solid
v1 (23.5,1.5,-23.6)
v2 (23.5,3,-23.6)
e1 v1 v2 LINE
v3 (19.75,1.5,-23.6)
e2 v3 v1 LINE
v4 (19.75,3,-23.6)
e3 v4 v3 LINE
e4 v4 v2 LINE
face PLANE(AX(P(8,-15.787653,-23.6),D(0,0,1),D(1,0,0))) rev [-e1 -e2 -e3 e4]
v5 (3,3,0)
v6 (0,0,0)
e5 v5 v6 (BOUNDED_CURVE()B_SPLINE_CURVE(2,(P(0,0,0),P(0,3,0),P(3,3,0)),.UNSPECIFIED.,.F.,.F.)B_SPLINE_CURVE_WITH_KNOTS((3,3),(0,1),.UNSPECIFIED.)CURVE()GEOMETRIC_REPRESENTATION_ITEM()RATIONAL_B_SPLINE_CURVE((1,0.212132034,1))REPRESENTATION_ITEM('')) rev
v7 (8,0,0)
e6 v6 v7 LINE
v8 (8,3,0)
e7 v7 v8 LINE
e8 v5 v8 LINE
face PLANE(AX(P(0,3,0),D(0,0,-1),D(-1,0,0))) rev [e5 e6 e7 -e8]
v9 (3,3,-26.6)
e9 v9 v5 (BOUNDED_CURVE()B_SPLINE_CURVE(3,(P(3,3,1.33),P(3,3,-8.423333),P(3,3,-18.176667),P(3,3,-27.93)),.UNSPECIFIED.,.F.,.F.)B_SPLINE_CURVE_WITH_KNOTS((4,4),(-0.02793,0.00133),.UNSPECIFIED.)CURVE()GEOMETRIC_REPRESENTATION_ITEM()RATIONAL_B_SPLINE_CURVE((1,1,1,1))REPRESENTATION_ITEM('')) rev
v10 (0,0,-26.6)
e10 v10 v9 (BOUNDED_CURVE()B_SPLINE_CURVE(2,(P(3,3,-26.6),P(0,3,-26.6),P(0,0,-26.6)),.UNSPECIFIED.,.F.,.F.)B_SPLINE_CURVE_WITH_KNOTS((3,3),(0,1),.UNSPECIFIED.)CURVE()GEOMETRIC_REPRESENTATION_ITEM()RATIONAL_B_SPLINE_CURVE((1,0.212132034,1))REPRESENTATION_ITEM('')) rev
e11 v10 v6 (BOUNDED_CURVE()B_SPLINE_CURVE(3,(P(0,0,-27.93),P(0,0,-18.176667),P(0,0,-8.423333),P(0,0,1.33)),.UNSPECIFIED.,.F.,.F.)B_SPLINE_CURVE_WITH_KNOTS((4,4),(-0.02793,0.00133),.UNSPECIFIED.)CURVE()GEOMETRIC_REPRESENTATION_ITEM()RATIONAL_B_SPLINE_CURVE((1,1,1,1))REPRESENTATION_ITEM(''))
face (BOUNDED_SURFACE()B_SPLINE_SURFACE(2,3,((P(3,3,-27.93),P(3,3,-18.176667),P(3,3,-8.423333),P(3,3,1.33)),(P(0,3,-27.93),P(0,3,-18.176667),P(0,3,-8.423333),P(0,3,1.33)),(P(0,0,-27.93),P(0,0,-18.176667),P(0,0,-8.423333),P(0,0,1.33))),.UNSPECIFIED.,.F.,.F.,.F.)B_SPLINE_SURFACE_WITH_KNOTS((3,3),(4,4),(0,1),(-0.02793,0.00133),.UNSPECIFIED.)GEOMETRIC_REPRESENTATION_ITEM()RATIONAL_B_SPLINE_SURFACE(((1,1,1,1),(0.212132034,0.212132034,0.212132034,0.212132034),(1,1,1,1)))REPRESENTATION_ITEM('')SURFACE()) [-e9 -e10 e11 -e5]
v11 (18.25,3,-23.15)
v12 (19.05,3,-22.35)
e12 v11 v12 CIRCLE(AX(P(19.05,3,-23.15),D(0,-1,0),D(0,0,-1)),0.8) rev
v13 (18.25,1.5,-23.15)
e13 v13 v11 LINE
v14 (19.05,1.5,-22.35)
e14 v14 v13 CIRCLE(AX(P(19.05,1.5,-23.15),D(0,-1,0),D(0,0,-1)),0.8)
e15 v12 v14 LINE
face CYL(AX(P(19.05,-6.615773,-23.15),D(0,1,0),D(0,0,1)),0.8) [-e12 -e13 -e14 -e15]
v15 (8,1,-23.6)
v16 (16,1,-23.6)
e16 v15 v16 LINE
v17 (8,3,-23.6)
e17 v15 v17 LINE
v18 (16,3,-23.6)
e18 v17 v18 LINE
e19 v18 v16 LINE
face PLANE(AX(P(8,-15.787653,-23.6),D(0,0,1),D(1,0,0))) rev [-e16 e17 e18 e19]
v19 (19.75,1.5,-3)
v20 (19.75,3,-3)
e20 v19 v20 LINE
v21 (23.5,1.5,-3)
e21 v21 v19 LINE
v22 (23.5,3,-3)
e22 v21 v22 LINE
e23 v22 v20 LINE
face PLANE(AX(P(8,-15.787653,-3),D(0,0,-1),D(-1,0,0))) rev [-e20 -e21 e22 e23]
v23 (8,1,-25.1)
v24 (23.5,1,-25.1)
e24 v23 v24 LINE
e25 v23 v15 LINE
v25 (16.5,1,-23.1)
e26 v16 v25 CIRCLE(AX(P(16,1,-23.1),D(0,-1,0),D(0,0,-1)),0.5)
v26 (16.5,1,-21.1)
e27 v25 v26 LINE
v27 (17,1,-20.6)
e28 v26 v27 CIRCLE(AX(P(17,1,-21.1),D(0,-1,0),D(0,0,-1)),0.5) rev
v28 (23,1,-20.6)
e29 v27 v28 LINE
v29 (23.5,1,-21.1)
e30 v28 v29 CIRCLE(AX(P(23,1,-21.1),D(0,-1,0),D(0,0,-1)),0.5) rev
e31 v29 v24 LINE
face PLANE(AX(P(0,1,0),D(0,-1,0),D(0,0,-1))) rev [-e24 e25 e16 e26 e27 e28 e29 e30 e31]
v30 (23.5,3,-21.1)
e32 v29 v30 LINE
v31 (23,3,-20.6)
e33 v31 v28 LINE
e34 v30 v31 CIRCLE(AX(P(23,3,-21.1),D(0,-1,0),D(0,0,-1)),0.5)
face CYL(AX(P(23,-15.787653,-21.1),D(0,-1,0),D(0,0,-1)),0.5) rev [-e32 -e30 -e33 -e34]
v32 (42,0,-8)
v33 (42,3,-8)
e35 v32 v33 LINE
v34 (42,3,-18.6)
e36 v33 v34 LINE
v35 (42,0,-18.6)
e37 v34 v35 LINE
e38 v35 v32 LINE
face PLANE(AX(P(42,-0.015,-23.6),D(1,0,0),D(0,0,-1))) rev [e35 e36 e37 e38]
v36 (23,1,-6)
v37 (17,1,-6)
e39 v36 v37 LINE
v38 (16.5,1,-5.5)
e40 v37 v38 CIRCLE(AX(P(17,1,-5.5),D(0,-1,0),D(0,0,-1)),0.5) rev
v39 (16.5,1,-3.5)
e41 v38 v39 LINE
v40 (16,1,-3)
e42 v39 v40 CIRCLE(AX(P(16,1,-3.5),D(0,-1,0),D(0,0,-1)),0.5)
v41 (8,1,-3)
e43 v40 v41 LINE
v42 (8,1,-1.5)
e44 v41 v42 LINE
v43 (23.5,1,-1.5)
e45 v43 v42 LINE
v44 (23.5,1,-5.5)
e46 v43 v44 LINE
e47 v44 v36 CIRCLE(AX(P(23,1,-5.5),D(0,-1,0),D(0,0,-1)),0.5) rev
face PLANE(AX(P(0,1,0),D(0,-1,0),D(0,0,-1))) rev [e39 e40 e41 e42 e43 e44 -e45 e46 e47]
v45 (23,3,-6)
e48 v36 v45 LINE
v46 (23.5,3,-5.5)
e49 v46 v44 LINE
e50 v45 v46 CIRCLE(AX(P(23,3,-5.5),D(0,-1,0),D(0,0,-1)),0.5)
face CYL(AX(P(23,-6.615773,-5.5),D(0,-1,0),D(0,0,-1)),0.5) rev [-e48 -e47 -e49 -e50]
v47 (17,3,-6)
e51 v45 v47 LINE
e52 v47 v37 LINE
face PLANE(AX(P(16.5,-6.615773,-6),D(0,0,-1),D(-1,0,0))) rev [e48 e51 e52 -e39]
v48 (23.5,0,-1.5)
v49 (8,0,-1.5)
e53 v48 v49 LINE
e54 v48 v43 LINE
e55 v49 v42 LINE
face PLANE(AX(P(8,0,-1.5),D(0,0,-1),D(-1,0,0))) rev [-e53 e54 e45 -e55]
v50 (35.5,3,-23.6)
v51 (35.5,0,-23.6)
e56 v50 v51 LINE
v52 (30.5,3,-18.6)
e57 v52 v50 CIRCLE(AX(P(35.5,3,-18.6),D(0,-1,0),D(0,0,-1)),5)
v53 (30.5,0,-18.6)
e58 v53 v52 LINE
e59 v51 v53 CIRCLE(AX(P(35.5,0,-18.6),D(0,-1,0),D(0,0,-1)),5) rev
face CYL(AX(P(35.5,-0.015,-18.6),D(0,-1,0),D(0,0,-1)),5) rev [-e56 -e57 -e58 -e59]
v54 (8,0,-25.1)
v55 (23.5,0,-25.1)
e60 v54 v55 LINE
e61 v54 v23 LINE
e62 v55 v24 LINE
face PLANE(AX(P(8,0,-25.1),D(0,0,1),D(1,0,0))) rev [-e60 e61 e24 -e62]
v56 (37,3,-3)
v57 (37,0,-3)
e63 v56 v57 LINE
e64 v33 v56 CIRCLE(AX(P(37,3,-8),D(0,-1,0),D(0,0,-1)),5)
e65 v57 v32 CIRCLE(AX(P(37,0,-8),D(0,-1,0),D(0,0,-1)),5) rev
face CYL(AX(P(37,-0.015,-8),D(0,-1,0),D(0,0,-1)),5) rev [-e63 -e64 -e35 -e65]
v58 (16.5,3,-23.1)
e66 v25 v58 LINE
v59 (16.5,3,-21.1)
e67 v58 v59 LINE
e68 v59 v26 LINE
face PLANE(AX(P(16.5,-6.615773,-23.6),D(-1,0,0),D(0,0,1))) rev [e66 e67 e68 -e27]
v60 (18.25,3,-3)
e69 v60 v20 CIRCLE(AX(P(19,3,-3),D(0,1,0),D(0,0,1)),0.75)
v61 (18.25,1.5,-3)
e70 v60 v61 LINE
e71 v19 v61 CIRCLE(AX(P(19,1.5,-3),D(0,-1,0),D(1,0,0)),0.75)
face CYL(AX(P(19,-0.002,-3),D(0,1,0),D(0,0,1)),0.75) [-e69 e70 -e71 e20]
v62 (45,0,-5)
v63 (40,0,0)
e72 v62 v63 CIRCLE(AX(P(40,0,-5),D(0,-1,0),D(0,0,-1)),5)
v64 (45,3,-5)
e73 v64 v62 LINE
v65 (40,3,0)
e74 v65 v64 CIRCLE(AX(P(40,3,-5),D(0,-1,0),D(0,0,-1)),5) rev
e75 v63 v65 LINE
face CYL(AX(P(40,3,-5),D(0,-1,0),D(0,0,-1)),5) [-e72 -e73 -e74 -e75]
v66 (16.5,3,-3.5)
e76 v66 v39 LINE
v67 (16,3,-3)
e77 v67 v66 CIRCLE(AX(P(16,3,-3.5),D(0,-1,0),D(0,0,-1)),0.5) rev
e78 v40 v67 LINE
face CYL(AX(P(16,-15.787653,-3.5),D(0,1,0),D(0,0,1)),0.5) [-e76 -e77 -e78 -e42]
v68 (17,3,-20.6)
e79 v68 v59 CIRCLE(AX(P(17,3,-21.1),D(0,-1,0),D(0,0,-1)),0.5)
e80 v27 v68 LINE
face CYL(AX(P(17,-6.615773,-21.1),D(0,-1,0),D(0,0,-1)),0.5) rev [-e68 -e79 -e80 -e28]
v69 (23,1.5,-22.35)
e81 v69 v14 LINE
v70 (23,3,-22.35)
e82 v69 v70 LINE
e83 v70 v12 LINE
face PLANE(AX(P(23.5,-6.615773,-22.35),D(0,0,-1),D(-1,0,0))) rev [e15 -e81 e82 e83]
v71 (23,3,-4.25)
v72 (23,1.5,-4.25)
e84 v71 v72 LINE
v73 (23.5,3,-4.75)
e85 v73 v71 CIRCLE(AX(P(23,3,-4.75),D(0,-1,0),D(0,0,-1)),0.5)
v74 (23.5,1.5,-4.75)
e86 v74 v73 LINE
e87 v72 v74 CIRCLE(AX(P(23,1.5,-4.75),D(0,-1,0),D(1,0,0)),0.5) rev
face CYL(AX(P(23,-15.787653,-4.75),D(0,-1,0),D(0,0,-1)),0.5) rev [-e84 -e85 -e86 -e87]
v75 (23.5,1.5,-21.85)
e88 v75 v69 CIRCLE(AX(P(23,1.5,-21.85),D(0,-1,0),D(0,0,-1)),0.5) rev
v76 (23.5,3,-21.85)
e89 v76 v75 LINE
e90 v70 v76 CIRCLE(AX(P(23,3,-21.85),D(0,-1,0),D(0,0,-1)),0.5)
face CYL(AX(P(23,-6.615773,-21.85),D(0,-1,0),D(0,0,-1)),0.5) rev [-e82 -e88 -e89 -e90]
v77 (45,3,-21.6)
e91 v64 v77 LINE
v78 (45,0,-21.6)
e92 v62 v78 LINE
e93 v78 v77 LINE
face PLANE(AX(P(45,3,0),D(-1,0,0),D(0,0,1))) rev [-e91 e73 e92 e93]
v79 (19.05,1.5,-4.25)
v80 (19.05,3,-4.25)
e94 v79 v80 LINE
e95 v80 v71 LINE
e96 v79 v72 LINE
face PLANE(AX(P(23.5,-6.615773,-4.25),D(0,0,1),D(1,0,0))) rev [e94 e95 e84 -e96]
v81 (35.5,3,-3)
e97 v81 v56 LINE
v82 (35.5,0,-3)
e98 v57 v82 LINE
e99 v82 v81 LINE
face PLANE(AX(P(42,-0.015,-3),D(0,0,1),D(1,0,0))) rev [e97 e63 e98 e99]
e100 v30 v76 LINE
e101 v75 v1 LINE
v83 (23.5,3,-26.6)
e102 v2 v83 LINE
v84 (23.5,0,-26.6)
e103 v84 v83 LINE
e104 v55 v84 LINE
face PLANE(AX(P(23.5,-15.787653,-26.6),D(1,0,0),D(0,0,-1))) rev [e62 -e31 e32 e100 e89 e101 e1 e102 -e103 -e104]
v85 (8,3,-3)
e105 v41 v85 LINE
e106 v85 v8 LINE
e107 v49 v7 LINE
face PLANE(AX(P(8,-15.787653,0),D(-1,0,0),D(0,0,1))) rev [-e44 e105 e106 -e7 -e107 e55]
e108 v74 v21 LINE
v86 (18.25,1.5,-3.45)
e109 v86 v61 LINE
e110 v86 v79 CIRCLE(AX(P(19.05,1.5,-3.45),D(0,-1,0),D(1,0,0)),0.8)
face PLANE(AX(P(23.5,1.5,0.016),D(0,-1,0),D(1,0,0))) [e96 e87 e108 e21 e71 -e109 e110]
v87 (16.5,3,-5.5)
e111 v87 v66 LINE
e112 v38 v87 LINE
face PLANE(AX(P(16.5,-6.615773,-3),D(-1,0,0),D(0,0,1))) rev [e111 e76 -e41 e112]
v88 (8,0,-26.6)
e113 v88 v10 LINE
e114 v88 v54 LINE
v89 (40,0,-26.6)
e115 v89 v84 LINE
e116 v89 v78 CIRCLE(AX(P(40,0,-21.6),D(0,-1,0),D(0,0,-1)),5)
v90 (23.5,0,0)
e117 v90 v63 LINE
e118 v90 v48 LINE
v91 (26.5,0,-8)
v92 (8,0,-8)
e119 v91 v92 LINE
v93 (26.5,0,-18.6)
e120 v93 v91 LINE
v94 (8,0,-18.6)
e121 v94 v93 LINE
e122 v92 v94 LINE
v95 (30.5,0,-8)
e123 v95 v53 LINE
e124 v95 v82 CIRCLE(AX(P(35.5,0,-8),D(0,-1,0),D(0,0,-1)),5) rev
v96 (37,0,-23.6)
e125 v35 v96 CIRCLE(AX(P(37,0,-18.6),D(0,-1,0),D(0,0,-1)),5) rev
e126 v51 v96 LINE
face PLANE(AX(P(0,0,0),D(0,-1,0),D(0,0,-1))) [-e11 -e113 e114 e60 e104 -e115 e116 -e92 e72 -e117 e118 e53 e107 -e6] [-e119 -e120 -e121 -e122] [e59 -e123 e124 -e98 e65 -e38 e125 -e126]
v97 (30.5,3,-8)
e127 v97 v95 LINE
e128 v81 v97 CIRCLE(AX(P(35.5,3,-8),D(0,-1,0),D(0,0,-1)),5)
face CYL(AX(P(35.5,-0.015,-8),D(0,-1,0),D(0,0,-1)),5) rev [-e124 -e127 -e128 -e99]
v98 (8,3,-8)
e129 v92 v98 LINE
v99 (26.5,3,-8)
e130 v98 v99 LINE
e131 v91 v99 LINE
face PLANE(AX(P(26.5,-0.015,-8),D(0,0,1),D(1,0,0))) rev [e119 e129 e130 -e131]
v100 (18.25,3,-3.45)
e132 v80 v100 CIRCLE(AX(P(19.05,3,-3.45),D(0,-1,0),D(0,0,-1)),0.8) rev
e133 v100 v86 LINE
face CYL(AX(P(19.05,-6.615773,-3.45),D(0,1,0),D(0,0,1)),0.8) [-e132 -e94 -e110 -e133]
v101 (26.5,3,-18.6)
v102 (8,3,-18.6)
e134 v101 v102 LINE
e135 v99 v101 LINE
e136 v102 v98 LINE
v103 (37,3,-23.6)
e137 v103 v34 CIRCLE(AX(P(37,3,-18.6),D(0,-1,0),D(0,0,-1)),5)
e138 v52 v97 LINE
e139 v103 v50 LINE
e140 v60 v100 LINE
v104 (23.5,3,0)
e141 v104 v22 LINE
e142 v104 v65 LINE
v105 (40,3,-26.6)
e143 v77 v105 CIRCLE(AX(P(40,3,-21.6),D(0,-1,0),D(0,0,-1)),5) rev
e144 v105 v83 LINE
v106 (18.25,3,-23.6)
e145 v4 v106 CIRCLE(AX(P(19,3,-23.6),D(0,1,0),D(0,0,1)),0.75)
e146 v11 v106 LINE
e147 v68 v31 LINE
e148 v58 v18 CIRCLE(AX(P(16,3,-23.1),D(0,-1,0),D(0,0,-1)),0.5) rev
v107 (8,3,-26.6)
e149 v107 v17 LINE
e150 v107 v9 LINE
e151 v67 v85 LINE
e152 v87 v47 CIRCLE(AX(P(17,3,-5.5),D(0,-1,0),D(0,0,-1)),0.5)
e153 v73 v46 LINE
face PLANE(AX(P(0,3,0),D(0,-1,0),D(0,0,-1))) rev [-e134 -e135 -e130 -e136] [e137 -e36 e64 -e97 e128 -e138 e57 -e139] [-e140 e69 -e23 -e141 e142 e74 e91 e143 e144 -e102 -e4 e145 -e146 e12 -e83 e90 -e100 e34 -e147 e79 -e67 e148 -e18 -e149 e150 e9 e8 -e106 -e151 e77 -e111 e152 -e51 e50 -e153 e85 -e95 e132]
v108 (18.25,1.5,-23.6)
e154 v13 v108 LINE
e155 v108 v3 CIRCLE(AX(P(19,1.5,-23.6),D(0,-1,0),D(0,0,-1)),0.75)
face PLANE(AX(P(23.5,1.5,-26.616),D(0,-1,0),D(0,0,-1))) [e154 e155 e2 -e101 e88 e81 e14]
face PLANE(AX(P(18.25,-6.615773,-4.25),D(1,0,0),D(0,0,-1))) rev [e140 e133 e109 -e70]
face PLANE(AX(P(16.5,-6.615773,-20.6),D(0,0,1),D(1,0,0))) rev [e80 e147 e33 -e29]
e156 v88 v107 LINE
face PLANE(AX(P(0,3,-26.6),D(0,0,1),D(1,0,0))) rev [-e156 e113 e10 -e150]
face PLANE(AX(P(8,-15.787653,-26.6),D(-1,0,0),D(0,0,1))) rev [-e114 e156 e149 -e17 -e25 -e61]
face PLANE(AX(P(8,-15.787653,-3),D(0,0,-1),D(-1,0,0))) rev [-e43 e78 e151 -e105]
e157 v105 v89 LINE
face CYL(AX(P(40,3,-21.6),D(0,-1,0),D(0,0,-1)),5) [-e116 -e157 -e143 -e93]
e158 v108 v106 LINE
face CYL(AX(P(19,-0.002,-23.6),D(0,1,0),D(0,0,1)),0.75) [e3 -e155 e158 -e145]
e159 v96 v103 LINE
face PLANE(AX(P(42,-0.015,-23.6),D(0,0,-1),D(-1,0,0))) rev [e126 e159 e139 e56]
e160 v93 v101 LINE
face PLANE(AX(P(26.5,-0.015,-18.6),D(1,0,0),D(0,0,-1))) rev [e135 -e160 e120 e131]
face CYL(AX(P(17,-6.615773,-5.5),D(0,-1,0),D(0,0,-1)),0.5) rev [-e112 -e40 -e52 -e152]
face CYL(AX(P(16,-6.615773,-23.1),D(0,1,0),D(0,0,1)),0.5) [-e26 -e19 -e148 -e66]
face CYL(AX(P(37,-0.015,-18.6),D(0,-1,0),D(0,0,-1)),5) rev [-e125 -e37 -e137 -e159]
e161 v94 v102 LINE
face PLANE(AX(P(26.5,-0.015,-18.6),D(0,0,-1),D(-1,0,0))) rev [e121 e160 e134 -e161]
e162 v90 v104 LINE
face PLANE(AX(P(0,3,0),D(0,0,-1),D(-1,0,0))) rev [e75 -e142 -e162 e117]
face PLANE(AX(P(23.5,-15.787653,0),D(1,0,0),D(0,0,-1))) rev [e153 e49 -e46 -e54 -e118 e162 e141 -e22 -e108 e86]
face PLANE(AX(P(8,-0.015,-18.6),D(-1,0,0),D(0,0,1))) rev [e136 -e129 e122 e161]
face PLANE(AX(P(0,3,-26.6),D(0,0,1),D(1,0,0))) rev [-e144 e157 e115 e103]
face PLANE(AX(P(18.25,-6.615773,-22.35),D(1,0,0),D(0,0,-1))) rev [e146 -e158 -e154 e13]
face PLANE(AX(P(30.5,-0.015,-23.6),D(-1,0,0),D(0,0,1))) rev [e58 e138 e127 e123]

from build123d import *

# Parameters (mm, degrees)
SKETCH1_W                      = 45
SKETCH1_H                      = 26.6
BOSS_EXTRUDE1_DEPTH            = 3
SKETCH3_W                      = 15.5
SKETCH3_H                      = 3
CUT_EXTRUDE1_DEPTH             = 2
SKETCH4_W                      = 15.5
SKETCH4_H                      = 1.5
CUT_EXTRUDE2_DEPTH             = 53.312140082
FILLET1_SIZE                   = 3
BOSS_EXTRUDE2_REACH            = 54.36
SKETCH5_R                      = 0.75
SKETCH6_W                      = 18.5
SKETCH6_H                      = 10.6
CUT_EXTRUDE3_DEPTH             = 53.359908383
CUT_EXTRUDE4_DEPTH             = 2
CUT_EXTRUDE5_REACH             = 52.901
SKETCH8_W                      = 5.25
SKETCH8_H                      = 0.5
CUT_EXTRUDE5_DIRECTION_2_REACH = 52.901
CUT_EXTRUDE6_REACH             = 52.901
SKETCH9_W                      = 5.25
SKETCH9_H                      = 0.5
CUT_EXTRUDE6_DIRECTION_2_REACH = 52.901
FILLET2_R                      = 0.8
FILLET3_R                      = 5
SKETCH10_W                     = 11.5
SKETCH10_H                     = 20.6
CUT_EXTRUDE7_DEPTH             = 53.359908383
FILLET4_R                      = 5
FILLET5_R                      = 0.5


with BuildPart() as part:
    # Sketch1 → Boss-Extrude1 (new body)
    with BuildSketch(Plane(origin=(0, 0, 0), x_dir=(1, 0, 0), z_dir=(0, 1, 0))):
        with Locations((22.5, 13.3)):
            Rectangle(SKETCH1_W, SKETCH1_H)
    extrude(amount=BOSS_EXTRUDE1_DEPTH)

    # Sketch3 → Cut-Extrude1 (cut)
    with BuildSketch(Plane(origin=(0, 3, 0), x_dir=(1, 0, 0), z_dir=(0, 1, 0))):
        with Locations((15.75, 25.1)):
            Rectangle(SKETCH3_W, SKETCH3_H)
        with Locations((15.75, 1.5)):
            Rectangle(SKETCH3_W, SKETCH3_H)
    extrude(amount=-CUT_EXTRUDE1_DEPTH, mode=Mode.SUBTRACT)

    # Sketch4 → Cut-Extrude2 (cut, through all)
    with BuildSketch(Plane(origin=(0, 1, 0), x_dir=(1, 0, 0), z_dir=(0, 1, 0))):
        with Locations((15.75, 0.75)):
            Rectangle(SKETCH4_W, SKETCH4_H)
        with Locations((15.75, 25.85)):
            Rectangle(SKETCH4_W, SKETCH4_H)
    extrude(amount=-CUT_EXTRUDE2_DEPTH, mode=Mode.SUBTRACT)

    # Fillet1
    # a fillet whose section is not a circle: 3 mm, written as the material it takes off along each edge
    with BuildSketch(Plane(origin=(0, 3, -34.1), x_dir=(1, 0, 0), z_dir=(0, 0, 1))) as fillet1_piece_1:
        with BuildLine():
            Bezier((FILLET1_SIZE, 0), (0, 0), (0, -FILLET1_SIZE), weights=[1, 0.212132034, 1])
            Line((0, -FILLET1_SIZE), (0, 0))
            Line((0, 0), (FILLET1_SIZE, 0))
        make_face()
    extrude(amount=41.6, mode=Mode.SUBTRACT)

    # Sketch5 → Boss-Extrude2 (add, up to next)
    with BuildSketch(Plane(origin=(0, 3, 0), x_dir=(1, 0, 0), z_dir=(0, 1, 0)), mode=Mode.PRIVATE) as boss_extrude2_sk1:
        with Locations((19, 3)):
            Circle(SKETCH5_R)
    boss_extrude2_tool1 = extrude(boss_extrude2_sk1.sketch, amount=-BOSS_EXTRUDE2_REACH, mode=Mode.PRIVATE) - part.part
    # Sketch5 → Boss-Extrude2 (add, up to next)
    with BuildSketch(Plane(origin=(0, 3, 0), x_dir=(1, 0, 0), z_dir=(0, 1, 0)), mode=Mode.PRIVATE) as boss_extrude2_sk2:
        with Locations((19, 23.6)):
            Circle(SKETCH5_R)
    boss_extrude2_tool2 = extrude(boss_extrude2_sk2.sketch, amount=-BOSS_EXTRUDE2_REACH, mode=Mode.PRIVATE) - part.part
    add(boss_extrude2_tool1.solids().sort_by_distance((19, 3, -3))[0])
    add(boss_extrude2_tool2.solids().sort_by_distance((19, 3, -23.6))[0])

    # Sketch6 → Cut-Extrude3 (cut, through all)
    with BuildSketch(Plane(origin=(0, 3, 0), x_dir=(1, 0, 0), z_dir=(0, 1, 0))):
        with Locations((17.25, 13.3)):
            Rectangle(SKETCH6_W, SKETCH6_H)
    extrude(amount=-CUT_EXTRUDE3_DEPTH, mode=Mode.SUBTRACT)

    # Sketch7 → Cut-Extrude4 (cut)
    with BuildSketch(Plane(origin=(0, 3, 0), x_dir=(1, 0, 0), z_dir=(0, 1, 0))):
        Polygon((18.25, 3), (16.5, 3), (16.5, 6), (23.5, 6), (23.5, 4.25), (18.25, 4.25), align=None)
        Polygon((18.25, 22.35), (18.25, 23.6), (16.5, 23.6), (16.5, 20.6), (23.5, 20.6), (23.5, 22.35), align=None)
    extrude(amount=-CUT_EXTRUDE4_DEPTH, mode=Mode.SUBTRACT)

    # Sketch8 → Cut-Extrude5 (cut, up to next)
    with BuildSketch(Plane.XY.offset(-3), mode=Mode.PRIVATE) as cut_extrude5_sk1:
        with Locations((20.875, 1.25)):
            Rectangle(SKETCH8_W, SKETCH8_H)
    cut_extrude5_tool1 = extrude(cut_extrude5_sk1.sketch, amount=-CUT_EXTRUDE5_REACH, mode=Mode.PRIVATE) & part.part
    add(cut_extrude5_tool1.solids().sort_by_distance((20.875, 1.25, -3))[0], mode=Mode.SUBTRACT)

    # Sketch8 → Cut-Extrude5 direction 2 (cut, up to next)
    with BuildSketch(Plane.XY.offset(-3), mode=Mode.PRIVATE) as cut_extrude5_direction_2_sk1:
        with Locations((20.875, 1.25)):
            Rectangle(SKETCH8_W, SKETCH8_H)
    cut_extrude5_direction_2_tool1 = extrude(cut_extrude5_direction_2_sk1.sketch, amount=CUT_EXTRUDE5_DIRECTION_2_REACH, mode=Mode.PRIVATE) & part.part
    add(cut_extrude5_direction_2_tool1.solids().sort_by_distance((20.875, 1.25, -3))[0], mode=Mode.SUBTRACT)

    # Sketch9 → Cut-Extrude6 (cut, up to next)
    with BuildSketch(Plane(origin=(0, 0, -23.6), x_dir=(-1, 0, 0), z_dir=(0, 0, -1)), mode=Mode.PRIVATE) as cut_extrude6_sk1:
        with Locations((-20.875, 1.25)):
            Rectangle(SKETCH9_W, SKETCH9_H)
    cut_extrude6_tool1 = extrude(cut_extrude6_sk1.sketch, amount=-CUT_EXTRUDE6_REACH, mode=Mode.PRIVATE) & part.part
    add(cut_extrude6_tool1.solids().sort_by_distance((20.875, 1.25, -23.6))[0], mode=Mode.SUBTRACT)

    # Sketch9 → Cut-Extrude6 direction 2 (cut, up to next)
    with BuildSketch(Plane(origin=(0, 0, -23.6), x_dir=(-1, 0, 0), z_dir=(0, 0, -1)), mode=Mode.PRIVATE) as cut_extrude6_direction_2_sk1:
        with Locations((-20.875, 1.25)):
            Rectangle(SKETCH9_W, SKETCH9_H)
    cut_extrude6_direction_2_tool1 = extrude(cut_extrude6_direction_2_sk1.sketch, amount=CUT_EXTRUDE6_DIRECTION_2_REACH, mode=Mode.PRIVATE) & part.part
    add(cut_extrude6_direction_2_tool1.solids().sort_by_distance((20.875, 1.25, -23.6))[0], mode=Mode.SUBTRACT)

    # Fillet2
    fillet2_edges = [part.edges().sort_by_distance(p)[0] for p in [
        (18.25, 2.25, -4.25),
        (18.25, 2.25, -22.35),
    ]]
    fillet(fillet2_edges, radius=FILLET2_R)

    # Fillet3
    fillet3_edges = [part.edges().sort_by_distance(p)[0] for p in [
        (45, 1.5, -26.6),
        (45, 1.5, 0),
    ]]
    fillet(fillet3_edges, radius=FILLET3_R)

    # Sketch10 → Cut-Extrude7 (cut, through all)
    with BuildSketch(Plane(origin=(0, 3, 0), x_dir=(1, 0, 0), z_dir=(0, 1, 0))):
        with Locations((36.25, 13.3)):
            Rectangle(SKETCH10_W, SKETCH10_H)
    extrude(amount=-CUT_EXTRUDE7_DEPTH, mode=Mode.SUBTRACT)

    # Fillet4
    fillet4_edges = [part.edges().sort_by_distance(p)[0] for p in [
        (42, 1.5, -23.6),
        (42, 1.5, -3),
        (30.5, 1.5, -3),
        (30.5, 1.5, -23.6),
    ]]
    fillet(fillet4_edges, radius=FILLET4_R)

    # Fillet5
    fillet5_edges = [part.edges().sort_by_distance(p)[0] for p in [
        (23.5, 2, -6),
        (16.5, 2, -6),
        (16.5, 2, -3),
        (16.5, 2, -23.6),
        (16.5, 2, -20.6),
        (23.5, 2, -20.6),
        (23.5, 2.25, -4.25),
        (23.5, 2.25, -22.35),
    ]]
    fillet(fillet5_edges, radius=FILLET5_R)


solid = part.part
